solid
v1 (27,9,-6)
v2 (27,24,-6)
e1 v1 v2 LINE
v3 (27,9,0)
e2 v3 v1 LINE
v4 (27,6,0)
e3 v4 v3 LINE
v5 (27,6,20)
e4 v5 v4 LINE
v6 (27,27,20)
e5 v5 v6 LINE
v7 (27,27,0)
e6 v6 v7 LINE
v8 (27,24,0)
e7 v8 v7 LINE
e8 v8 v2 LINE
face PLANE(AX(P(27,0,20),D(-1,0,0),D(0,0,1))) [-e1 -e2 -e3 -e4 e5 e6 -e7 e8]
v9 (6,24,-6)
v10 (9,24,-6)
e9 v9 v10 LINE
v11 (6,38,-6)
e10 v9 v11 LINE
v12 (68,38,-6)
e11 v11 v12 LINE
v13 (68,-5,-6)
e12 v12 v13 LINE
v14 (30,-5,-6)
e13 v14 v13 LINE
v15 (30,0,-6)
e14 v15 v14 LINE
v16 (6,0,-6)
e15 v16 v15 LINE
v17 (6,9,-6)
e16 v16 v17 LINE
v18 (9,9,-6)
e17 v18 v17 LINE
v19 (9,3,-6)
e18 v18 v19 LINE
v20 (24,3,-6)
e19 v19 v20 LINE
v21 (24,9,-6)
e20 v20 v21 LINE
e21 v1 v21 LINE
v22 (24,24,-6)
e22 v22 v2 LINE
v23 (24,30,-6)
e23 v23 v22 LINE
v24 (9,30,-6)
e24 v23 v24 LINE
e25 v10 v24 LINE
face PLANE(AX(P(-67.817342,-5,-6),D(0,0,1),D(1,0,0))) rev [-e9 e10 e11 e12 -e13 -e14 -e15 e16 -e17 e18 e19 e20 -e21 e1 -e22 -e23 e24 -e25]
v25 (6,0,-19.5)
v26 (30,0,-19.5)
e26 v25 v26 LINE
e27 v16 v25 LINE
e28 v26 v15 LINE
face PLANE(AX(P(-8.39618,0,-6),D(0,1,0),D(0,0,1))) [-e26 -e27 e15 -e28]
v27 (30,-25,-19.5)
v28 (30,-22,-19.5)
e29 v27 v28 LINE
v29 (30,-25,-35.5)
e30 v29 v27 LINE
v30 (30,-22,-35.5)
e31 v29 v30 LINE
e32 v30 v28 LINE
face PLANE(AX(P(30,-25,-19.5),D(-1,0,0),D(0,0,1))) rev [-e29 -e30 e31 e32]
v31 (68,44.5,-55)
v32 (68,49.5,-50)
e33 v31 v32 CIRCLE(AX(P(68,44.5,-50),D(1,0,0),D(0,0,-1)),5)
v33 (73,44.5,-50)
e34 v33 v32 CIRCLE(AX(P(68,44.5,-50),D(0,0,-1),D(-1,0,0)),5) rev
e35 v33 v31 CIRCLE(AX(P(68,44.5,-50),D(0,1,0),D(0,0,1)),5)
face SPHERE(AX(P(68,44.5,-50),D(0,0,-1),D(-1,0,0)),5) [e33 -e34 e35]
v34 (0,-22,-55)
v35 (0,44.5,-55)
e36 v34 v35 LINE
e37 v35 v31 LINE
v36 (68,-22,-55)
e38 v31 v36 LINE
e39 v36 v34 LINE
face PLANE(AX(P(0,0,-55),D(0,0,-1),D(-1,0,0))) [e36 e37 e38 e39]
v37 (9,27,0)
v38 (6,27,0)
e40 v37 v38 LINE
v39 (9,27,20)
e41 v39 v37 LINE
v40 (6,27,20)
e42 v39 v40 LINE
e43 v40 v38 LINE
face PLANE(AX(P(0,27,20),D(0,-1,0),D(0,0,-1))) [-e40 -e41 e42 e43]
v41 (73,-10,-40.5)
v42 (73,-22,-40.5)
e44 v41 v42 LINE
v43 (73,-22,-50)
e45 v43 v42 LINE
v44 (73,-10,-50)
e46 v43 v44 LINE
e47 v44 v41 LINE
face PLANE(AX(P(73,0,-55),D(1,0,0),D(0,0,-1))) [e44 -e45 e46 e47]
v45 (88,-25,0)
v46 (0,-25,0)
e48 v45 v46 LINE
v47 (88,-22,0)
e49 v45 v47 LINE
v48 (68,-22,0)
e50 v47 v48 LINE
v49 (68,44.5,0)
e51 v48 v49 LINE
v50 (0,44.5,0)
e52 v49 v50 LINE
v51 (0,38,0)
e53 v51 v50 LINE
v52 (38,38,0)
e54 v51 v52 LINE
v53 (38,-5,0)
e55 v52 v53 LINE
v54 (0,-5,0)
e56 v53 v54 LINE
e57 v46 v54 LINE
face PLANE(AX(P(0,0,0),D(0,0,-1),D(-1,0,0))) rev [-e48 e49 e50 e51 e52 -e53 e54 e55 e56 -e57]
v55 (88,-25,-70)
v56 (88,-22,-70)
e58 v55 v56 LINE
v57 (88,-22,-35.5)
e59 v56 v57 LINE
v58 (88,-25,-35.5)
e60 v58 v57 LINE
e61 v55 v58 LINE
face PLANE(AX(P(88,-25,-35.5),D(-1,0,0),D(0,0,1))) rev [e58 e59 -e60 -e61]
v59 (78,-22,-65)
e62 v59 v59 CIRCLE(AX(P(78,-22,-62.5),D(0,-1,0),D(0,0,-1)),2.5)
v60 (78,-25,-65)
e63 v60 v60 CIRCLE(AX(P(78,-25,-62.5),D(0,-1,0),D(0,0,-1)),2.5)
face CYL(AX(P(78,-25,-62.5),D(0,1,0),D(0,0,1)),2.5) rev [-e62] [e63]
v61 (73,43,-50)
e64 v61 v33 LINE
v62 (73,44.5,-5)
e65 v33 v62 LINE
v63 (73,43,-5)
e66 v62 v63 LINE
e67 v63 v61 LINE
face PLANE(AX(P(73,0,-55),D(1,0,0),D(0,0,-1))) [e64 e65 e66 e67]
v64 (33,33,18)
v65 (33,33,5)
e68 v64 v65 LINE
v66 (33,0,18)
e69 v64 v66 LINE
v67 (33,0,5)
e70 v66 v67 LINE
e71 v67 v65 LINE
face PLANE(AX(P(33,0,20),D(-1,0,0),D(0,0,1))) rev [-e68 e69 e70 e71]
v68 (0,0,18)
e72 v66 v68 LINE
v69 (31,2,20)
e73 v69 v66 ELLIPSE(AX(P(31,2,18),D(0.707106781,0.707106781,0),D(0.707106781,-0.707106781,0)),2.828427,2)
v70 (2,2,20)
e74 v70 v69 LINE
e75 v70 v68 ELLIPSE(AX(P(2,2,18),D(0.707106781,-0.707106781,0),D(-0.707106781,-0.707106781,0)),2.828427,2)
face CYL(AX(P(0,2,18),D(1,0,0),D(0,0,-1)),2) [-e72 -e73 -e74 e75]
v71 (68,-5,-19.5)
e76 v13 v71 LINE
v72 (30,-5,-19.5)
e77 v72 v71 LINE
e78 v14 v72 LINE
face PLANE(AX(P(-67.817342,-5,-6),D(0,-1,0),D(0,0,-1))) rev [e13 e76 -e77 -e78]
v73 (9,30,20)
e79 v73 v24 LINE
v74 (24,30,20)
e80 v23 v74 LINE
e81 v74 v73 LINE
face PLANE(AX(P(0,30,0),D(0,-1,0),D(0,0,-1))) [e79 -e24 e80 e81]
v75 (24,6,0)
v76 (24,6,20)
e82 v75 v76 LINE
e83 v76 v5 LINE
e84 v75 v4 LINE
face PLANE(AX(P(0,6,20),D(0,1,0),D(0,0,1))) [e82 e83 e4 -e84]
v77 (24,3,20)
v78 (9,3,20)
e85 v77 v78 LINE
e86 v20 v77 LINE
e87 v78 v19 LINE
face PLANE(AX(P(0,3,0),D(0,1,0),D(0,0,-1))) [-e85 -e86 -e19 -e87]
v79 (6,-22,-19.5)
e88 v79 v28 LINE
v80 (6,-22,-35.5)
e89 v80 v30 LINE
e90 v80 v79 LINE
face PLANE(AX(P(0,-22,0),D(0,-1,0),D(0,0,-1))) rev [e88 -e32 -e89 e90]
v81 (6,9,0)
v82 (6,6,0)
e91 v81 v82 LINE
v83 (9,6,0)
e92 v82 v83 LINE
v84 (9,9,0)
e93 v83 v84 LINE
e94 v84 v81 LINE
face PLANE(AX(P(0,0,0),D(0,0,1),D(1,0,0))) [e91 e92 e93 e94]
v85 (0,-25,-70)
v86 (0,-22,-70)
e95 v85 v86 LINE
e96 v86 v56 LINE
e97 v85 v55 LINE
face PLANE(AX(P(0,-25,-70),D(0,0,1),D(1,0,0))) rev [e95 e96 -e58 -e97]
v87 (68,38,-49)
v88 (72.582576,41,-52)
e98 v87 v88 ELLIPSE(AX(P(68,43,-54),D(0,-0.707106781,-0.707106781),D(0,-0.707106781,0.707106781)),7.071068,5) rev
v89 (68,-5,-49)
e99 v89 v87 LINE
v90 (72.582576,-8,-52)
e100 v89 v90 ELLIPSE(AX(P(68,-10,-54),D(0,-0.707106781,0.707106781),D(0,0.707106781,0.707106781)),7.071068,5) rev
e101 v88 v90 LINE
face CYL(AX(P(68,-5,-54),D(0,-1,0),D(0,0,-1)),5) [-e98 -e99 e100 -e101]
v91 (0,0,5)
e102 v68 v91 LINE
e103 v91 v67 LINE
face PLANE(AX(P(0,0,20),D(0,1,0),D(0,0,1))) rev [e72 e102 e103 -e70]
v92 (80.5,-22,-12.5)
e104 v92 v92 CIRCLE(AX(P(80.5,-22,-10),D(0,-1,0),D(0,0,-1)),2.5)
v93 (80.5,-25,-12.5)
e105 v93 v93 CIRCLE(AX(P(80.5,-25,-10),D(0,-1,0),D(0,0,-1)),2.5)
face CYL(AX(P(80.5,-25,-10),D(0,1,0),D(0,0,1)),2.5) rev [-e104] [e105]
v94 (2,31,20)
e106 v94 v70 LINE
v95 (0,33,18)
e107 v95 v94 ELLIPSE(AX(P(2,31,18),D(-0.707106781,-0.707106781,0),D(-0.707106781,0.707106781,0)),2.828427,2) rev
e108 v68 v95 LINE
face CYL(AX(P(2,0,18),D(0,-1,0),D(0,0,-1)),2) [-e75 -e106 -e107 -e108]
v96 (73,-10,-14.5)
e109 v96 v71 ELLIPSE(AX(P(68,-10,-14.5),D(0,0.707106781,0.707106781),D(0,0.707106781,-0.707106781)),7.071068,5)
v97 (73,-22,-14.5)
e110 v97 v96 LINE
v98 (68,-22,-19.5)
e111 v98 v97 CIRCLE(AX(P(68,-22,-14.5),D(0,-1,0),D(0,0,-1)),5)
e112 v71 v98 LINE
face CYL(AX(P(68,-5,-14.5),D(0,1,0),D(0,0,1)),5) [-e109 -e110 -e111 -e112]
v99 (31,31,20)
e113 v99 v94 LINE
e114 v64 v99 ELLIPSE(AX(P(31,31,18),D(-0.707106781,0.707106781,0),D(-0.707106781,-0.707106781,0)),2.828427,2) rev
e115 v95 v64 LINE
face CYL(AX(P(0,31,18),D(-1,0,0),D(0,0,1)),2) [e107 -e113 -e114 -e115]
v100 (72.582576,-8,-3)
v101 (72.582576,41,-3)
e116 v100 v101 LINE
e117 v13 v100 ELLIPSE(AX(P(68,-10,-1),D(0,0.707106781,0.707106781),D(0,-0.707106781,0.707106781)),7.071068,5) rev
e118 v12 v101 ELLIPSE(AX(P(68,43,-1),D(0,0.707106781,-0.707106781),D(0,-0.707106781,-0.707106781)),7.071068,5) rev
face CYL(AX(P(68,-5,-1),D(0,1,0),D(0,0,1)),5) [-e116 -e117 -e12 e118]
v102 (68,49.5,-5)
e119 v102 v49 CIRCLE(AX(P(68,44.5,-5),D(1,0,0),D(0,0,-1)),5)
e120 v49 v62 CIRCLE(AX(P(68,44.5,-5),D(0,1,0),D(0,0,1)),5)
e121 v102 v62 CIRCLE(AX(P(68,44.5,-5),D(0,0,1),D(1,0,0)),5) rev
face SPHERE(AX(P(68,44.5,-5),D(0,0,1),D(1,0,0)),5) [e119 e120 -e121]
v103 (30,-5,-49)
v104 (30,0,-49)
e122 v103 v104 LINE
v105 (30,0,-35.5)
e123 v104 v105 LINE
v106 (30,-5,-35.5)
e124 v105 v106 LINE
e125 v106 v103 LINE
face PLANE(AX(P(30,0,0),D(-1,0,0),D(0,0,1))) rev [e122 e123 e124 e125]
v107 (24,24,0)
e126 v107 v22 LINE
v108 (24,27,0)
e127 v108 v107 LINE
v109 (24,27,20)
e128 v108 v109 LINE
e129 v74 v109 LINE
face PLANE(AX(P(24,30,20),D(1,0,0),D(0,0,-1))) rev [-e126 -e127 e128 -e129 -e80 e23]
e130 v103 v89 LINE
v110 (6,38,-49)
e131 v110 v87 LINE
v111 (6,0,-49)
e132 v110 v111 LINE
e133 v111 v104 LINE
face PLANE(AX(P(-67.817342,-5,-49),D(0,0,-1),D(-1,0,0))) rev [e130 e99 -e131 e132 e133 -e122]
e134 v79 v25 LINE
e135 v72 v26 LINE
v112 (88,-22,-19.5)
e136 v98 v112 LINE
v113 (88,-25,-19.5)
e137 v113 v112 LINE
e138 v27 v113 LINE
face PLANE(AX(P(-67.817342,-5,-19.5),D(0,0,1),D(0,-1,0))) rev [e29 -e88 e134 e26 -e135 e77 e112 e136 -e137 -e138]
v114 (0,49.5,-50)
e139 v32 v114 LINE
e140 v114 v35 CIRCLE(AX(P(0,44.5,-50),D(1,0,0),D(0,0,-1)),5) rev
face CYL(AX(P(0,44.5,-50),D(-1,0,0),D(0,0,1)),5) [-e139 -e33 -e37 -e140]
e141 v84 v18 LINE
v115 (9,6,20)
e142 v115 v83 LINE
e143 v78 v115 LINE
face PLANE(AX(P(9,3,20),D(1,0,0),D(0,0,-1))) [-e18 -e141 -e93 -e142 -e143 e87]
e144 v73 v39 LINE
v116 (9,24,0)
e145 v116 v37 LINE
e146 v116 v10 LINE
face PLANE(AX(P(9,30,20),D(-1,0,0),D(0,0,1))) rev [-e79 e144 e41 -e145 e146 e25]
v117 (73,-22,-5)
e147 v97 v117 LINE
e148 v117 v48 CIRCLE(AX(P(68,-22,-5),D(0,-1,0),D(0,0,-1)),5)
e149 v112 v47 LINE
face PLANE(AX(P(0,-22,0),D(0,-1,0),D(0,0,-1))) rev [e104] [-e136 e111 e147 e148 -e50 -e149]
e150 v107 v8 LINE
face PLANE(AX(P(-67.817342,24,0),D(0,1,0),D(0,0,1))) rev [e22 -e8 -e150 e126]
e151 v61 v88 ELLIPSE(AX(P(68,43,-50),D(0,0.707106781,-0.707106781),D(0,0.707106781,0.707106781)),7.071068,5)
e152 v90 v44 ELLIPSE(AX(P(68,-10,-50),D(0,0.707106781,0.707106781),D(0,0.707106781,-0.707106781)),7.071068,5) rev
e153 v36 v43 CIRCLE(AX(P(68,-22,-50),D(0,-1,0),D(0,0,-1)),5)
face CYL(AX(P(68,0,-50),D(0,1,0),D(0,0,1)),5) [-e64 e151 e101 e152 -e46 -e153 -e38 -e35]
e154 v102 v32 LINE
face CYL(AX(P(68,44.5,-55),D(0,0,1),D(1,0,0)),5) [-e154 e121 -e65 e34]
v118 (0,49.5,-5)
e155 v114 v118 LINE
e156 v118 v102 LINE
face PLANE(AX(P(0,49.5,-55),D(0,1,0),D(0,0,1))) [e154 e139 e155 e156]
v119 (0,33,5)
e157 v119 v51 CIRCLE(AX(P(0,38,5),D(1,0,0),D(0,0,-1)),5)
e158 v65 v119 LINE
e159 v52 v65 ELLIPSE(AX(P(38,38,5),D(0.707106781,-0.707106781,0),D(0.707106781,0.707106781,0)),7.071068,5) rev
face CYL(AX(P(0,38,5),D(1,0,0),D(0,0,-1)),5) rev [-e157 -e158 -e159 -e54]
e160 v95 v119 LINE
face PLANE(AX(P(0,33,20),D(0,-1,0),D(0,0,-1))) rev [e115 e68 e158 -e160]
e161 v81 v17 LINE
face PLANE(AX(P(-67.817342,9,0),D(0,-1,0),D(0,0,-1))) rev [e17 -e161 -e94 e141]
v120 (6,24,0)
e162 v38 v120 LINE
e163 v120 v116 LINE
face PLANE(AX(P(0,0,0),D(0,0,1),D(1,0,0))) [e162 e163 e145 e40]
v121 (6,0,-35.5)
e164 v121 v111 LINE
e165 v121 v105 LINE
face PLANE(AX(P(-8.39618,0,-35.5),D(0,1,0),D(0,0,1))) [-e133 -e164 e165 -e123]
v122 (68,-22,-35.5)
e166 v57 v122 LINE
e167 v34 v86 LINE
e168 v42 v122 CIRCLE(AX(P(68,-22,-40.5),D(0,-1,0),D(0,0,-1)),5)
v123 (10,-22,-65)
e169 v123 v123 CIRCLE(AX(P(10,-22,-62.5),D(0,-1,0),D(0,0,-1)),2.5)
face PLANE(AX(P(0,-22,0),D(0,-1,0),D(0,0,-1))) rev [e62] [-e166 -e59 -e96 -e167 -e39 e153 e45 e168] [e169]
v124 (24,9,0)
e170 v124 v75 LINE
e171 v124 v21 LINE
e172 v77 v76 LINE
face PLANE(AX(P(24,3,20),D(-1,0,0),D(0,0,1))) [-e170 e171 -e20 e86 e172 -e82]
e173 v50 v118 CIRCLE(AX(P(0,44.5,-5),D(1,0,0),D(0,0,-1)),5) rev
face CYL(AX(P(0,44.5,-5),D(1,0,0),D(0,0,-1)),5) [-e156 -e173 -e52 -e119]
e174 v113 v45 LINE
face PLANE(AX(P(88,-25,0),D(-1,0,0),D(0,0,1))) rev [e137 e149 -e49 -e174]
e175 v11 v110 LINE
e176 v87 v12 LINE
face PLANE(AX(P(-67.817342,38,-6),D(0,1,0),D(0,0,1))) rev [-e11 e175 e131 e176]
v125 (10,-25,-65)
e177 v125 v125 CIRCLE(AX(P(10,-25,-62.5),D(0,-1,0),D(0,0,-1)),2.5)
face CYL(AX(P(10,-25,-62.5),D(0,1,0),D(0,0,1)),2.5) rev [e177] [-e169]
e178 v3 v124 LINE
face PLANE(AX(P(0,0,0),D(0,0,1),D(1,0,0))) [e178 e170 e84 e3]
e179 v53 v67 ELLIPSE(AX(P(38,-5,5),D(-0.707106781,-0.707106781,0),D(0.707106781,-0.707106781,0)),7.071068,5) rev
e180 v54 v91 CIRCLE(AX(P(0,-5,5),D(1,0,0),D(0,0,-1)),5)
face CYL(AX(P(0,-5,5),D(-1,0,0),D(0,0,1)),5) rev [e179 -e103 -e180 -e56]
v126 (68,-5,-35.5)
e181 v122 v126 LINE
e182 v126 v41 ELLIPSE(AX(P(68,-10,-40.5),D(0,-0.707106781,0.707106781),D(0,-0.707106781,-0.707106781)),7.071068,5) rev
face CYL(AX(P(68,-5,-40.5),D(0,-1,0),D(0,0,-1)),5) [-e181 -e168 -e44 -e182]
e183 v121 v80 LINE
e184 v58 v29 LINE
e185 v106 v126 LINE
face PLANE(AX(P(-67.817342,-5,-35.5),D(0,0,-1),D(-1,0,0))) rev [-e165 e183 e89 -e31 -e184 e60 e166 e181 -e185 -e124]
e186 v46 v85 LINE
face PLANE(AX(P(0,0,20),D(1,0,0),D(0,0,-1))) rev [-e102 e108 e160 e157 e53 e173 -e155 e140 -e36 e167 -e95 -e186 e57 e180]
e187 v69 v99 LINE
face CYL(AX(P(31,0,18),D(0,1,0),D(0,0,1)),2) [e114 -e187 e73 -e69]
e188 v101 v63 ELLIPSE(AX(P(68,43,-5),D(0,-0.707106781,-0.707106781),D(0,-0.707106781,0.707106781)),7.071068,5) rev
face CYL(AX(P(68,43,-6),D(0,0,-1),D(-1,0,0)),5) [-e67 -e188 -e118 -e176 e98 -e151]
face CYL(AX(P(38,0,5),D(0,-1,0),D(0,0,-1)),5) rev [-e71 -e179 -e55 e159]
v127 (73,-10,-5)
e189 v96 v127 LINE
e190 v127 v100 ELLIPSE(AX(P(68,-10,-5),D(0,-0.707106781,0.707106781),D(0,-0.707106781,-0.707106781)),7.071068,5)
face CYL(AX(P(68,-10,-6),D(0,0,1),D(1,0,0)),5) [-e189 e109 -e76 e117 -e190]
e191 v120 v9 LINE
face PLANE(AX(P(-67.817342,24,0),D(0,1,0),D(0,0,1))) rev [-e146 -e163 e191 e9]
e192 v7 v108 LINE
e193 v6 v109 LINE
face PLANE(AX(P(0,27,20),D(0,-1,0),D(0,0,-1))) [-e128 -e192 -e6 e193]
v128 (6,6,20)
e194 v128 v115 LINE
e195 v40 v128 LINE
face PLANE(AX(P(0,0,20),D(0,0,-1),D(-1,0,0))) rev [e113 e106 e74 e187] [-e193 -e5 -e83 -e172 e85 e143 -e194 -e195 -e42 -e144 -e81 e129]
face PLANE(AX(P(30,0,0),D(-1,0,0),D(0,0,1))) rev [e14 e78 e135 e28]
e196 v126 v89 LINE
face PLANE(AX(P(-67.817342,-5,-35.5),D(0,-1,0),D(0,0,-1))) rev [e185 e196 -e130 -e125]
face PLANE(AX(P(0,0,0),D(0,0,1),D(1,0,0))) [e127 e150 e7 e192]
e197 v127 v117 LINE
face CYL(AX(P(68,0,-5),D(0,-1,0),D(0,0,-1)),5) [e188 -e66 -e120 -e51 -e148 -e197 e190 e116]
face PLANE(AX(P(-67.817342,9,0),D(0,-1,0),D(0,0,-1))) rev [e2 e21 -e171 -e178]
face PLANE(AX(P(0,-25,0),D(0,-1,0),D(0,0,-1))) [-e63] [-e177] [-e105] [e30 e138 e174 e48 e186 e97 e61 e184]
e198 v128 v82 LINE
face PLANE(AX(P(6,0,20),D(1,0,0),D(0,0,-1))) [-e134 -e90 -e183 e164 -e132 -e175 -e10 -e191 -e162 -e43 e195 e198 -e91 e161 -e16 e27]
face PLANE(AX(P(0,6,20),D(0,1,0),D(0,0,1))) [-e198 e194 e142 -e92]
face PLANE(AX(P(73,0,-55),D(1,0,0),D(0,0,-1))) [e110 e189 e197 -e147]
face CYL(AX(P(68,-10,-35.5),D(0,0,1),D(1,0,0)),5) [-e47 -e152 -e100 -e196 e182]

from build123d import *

# Parameters (mm, degrees)
SKETCH1_W           = 33
SKETCH1_H           = 33
BOSS_EXTRUDE1_DEPTH = 20
SHELL1_T            = -6
SKETCH2_W           = 73
SKETCH2_H           = 71.5
BOSS_EXTRUDE2_DEPTH = 55
SKETCH7_W           = 15
SKETCH7_H           = 50
CUT_EXTRUDE2_DEPTH  = 3
SKETCH9_W           = 21
SKETCH9_H           = 21
CUT_EXTRUDE5_DEPTH  = 45
SKETCH16_W          = 55
SKETCH16_H          = 55
BOSS_EXTRUDE5_DEPTH = 40
CUT_EXTRUDE14_REACH = 105.943
BOSS_EXTRUDE6_START = -26
SKETCH23_W          = 3
SKETCH23_H          = 3
BOSS_EXTRUDE6_DEPTH = 6
BOSS_EXTRUDE7_REACH = 148.943
BOSS_EXTRUDE7_START = -43
SKETCH24_W          = 13.5
SKETCH24_H          = 5
SKETCH25_R          = 2.5
BOSS_EXTRUDE8_DEPTH = 3
FILLET1_R           = 5
FILLET2_R           = 2


with BuildPart() as part:
    # Sketch1 → Boss-Extrude1 (new body)
    with BuildSketch(Plane.XY):
        with Locations((16.5, 16.5)):
            Rectangle(SKETCH1_W, SKETCH1_H)
    extrude(amount=BOSS_EXTRUDE1_DEPTH)

    # Shell1
    shell1_openings = [part.faces().sort_by_distance(p)[0] for p in [
        (16.5, 16.5, 20),
    ]]
    offset(amount=SHELL1_T, openings=shell1_openings, kind=Kind.INTERSECTION)

    # Sketch2 → Boss-Extrude2 (add)
    with BuildSketch(Plane(origin=(0, 0, 0), x_dir=(-1, 0, 0), z_dir=(0, 0, -1))):
        with Locations((-36.5, 13.75)):
            Rectangle(SKETCH2_W, SKETCH2_H)
    extrude(amount=BOSS_EXTRUDE2_DEPTH)

    # Sketch7 → Cut-Extrude2 (cut)
    with BuildSketch(Plane.XZ.offset(-27)):
        with Locations((16.5, -5)):
            Rectangle(SKETCH7_W, SKETCH7_H)
    cut_extrude2 = extrude(amount=-CUT_EXTRUDE2_DEPTH, mode=Mode.SUBTRACT)

    # Sketch9 → Cut-Extrude5 (cut)
    with BuildSketch(Plane.XY.offset(6)):
        with Locations((16.5, 16.5)):
            Rectangle(SKETCH9_W, SKETCH9_H)
    extrude(amount=-CUT_EXTRUDE5_DEPTH, mode=Mode.SUBTRACT)

    # Mirror2: Cut-Extrude2 across plane
    add(cut_extrude2.mirror(Plane(origin=(0, 16.5, 0), x_dir=(0, 0, 1), z_dir=(0, -1, 0))), mode=Mode.SUBTRACT)

    # Sketch16 → Boss-Extrude5 (add)
    with BuildSketch(Plane(origin=(33, 0, 0), x_dir=(0, 0, -1), z_dir=(1, 0, 0))):
        with Locations((27.5, 16.5)):
            Rectangle(SKETCH16_W, SKETCH16_H)
    extrude(amount=BOSS_EXTRUDE5_DEPTH)

    # Cut-Extrude14: up to this face of the body (flat: up to its plane)
    cut_extrude14_end = Plane(part.part.faces().sort_by_distance((6, 16.5, -9.5))[0])
    # Sketch22 → Cut-Extrude14 (cut, up to the picked face)
    with BuildSketch(Plane(origin=(73, 0, 0), x_dir=(0, 0, -1), z_dir=(1, 0, 0)), mode=Mode.PRIVATE) as cut_extrude14_sk1:
        Polygon((6, -5), (19.5, -5), (19.5, -22), (35.5, -22), (35.5, -5), (49, -5), (49, 38), (6, 38), align=None)
    cut_extrude14_tool1 = split(extrude(cut_extrude14_sk1.sketch, amount=-CUT_EXTRUDE14_REACH, mode=Mode.PRIVATE), bisect_by=cut_extrude14_end, keep=Keep.BOTH, mode=Mode.PRIVATE)
    add(cut_extrude14_tool1.solids().sort_by(Axis((73, 12.652758, -27.5), (-1, 0, 0)))[0], mode=Mode.SUBTRACT)

    # Sketch23 → Boss-Extrude6 (add)
    with BuildSketch(Plane.XY.offset(20).offset(BOSS_EXTRUDE6_START)):
        with Locations((7.5, 7.5)):
            Rectangle(SKETCH23_W, SKETCH23_H)
        with Locations((7.5, 25.5)):
            Rectangle(SKETCH23_W, SKETCH23_H)
        with Locations((25.5, 25.5)):
            Rectangle(SKETCH23_W, SKETCH23_H)
        with Locations((25.5, 7.5)):
            Rectangle(SKETCH23_W, SKETCH23_H)
    extrude(amount=BOSS_EXTRUDE6_DEPTH)

    # Sketch24 → Boss-Extrude7 (add, up to next)
    with BuildSketch(Plane(origin=(73, 0, 0), x_dir=(0, 0, -1), z_dir=(1, 0, 0)).offset(BOSS_EXTRUDE7_START), mode=Mode.PRIVATE) as boss_extrude7_sk1:
        with Locations((12.75, -2.5)):
            Rectangle(SKETCH24_W, SKETCH24_H)
    boss_extrude7_tool1 = extrude(boss_extrude7_sk1.sketch, amount=-BOSS_EXTRUDE7_REACH, mode=Mode.PRIVATE) - part.part
    # Sketch24 → Boss-Extrude7 (add, up to next)
    with BuildSketch(Plane(origin=(73, 0, 0), x_dir=(0, 0, -1), z_dir=(1, 0, 0)).offset(BOSS_EXTRUDE7_START), mode=Mode.PRIVATE) as boss_extrude7_sk2:
        with Locations((42.25, -2.5)):
            Rectangle(SKETCH24_W, SKETCH24_H)
    boss_extrude7_tool2 = extrude(boss_extrude7_sk2.sketch, amount=-BOSS_EXTRUDE7_REACH, mode=Mode.PRIVATE) - part.part
    add(boss_extrude7_tool1.solids().sort_by_distance((30, -2.5, -12.75))[0])
    add(boss_extrude7_tool2.solids().sort_by_distance((30, -2.5, -42.25))[0])

    # Sketch25 → Boss-Extrude8 (add)
    with BuildSketch(Plane.XZ.offset(22)):
        Polygon((0, 0), (88, 0), (88, -19.5), (30, -19.5), (30, -35.5), (88, -35.5), (88, -70), (0, -70), align=None)
        with Locations(Location((10, -62.5, 0), (0, 0, 270))):
            Circle(SKETCH25_R, mode=Mode.SUBTRACT)
        with Locations(Location((78, -62.5, 0), (0, 0, 270))):
            Circle(SKETCH25_R, mode=Mode.SUBTRACT)
        with Locations(Location((80.5, -10, 0), (0, 0, 270))):
            Circle(SKETCH25_R, mode=Mode.SUBTRACT)
    extrude(amount=BOSS_EXTRUDE8_DEPTH)

    # Fillet1
    # the kernel refuses this fillet: 5 mm, written as the material it adds along each edge
    with BuildSketch(Plane(origin=(33, 33, 0), x_dir=(0, 0, 1), z_dir=(-1, 0, 0)), Plane(origin=(33, 0, 0), x_dir=(0, 0, 1), z_dir=(0, 1, 0)), Plane(origin=(0, 0, 0), x_dir=(0, 0, 1), z_dir=(1, 0, 0))) as fillet1_piece_1:
        with BuildLine():
            CenterArc((FILLET1_R, FILLET1_R), FILLET1_R, 180, 90)
            Line((0, FILLET1_R), (-FILLET1_R * 0.02, FILLET1_R))
            Line((-FILLET1_R * 0.02, FILLET1_R), (-FILLET1_R * 0.02, -FILLET1_R * 0.02))
            Line((-FILLET1_R * 0.02, -FILLET1_R * 0.02), (FILLET1_R, -FILLET1_R * 0.02))
            Line((FILLET1_R, -FILLET1_R * 0.02), (FILLET1_R, 0))
        make_face()
    extrude(amount=33)
    with BuildSketch(Plane(origin=(33, 0, 0), x_dir=(0, 0, 1), z_dir=(0, 1, 0))) as fillet1_piece_2a_section:
        with BuildLine():
            CenterArc((FILLET1_R, FILLET1_R), FILLET1_R, 180, 90)
            Line((0, FILLET1_R), (-FILLET1_R * 0.02, FILLET1_R))
            Line((-FILLET1_R * 0.02, FILLET1_R), (-FILLET1_R * 0.02, -FILLET1_R * 0.02))
            Line((-FILLET1_R * 0.02, -FILLET1_R * 0.02), (FILLET1_R, -FILLET1_R * 0.02))
            Line((FILLET1_R, -FILLET1_R * 0.02), (FILLET1_R, 0))
        make_face()
    fillet1_piece_2a = extrude(amount=45.5, mode=Mode.PRIVATE)
    fillet1_piece_2a = split(fillet1_piece_2a, bisect_by=Plane(origin=(34.131975571, 33, 1.131975571), z_dir=(0, 1, 0)), keep=Keep.TOP, mode=Mode.PRIVATE)
    with BuildSketch(Plane(origin=(45.5, 33, 0), x_dir=(0, 0, 1), z_dir=(-1, 0, 0))) as fillet1_piece_2b_section:
        with BuildLine():
            CenterArc((FILLET1_R, FILLET1_R), FILLET1_R, 180, 90)
            Line((0, FILLET1_R), (-FILLET1_R * 0.02, FILLET1_R))
            Line((-FILLET1_R * 0.02, FILLET1_R), (-FILLET1_R * 0.02, -FILLET1_R * 0.02))
            Line((-FILLET1_R * 0.02, -FILLET1_R * 0.02), (FILLET1_R, -FILLET1_R * 0.02))
            Line((FILLET1_R, -FILLET1_R * 0.02), (FILLET1_R, 0))
        make_face()
    fillet1_piece_2b = extrude(amount=45.5, mode=Mode.PRIVATE)
    fillet1_piece_2b = split(fillet1_piece_2b, bisect_by=Plane(origin=(33, 34.131975571, 1.131975571), z_dir=(1, 0, 0)), keep=Keep.TOP, mode=Mode.PRIVATE)
    fillet1_piece_2 = fillet1_piece_2a & fillet1_piece_2b
    add(fillet1_piece_2)
    with BuildSketch(Plane(origin=(0, 0, 0), x_dir=(0, 0, 1), z_dir=(1, 0, 0))) as fillet1_piece_3a_section:
        with BuildLine():
            CenterArc((FILLET1_R, FILLET1_R), FILLET1_R, 180, 90)
            Line((0, FILLET1_R), (-FILLET1_R * 0.02, FILLET1_R))
            Line((-FILLET1_R * 0.02, FILLET1_R), (-FILLET1_R * 0.02, -FILLET1_R * 0.02))
            Line((-FILLET1_R * 0.02, -FILLET1_R * 0.02), (FILLET1_R, -FILLET1_R * 0.02))
            Line((FILLET1_R, -FILLET1_R * 0.02), (FILLET1_R, 0))
        make_face()
    fillet1_piece_3a = extrude(amount=45.5, mode=Mode.PRIVATE)
    fillet1_piece_3a = split(fillet1_piece_3a, bisect_by=Plane(origin=(33, -1.131975571, 1.131975571), z_dir=(1, 0, 0)), keep=Keep.TOP, mode=Mode.PRIVATE)
    with BuildSketch(Plane(origin=(33, -12.5, 0), x_dir=(0, 0, 1), z_dir=(0, 1, 0))) as fillet1_piece_3b_section:
        with BuildLine():
            CenterArc((FILLET1_R, FILLET1_R), FILLET1_R, 180, 90)
            Line((0, FILLET1_R), (-FILLET1_R * 0.02, FILLET1_R))
            Line((-FILLET1_R * 0.02, FILLET1_R), (-FILLET1_R * 0.02, -FILLET1_R * 0.02))
            Line((-FILLET1_R * 0.02, -FILLET1_R * 0.02), (FILLET1_R, -FILLET1_R * 0.02))
            Line((FILLET1_R, -FILLET1_R * 0.02), (FILLET1_R, 0))
        make_face()
    fillet1_piece_3b = extrude(amount=45.5, mode=Mode.PRIVATE)
    fillet1_piece_3b = split(fillet1_piece_3b, bisect_by=Plane(origin=(34.131975571, 0, 1.131975571), z_dir=(0, -1, 0)), keep=Keep.TOP, mode=Mode.PRIVATE)
    fillet1_piece_3 = fillet1_piece_3a & fillet1_piece_3b
    add(fillet1_piece_3)
    # the kernel refuses this fillet: 5 mm, written as the material it takes off along each edge
    with BuildSketch(Plane(origin=(68, 44.5, -50), x_dir=(0, 1, 0), z_dir=(1, 0, 0))) as fillet1_2_piece_1_section:
        Polygon((0, 0), (FILLET1_R * 1.02, 0), (FILLET1_R * 1.02, -FILLET1_R * 1.02), (0, -FILLET1_R * 1.02), align=None)
    fillet1_2_piece_1 = extrude(amount=FILLET1_R * 1.02, mode=Mode.PRIVATE)
    fillet1_2_piece_1 = fillet1_2_piece_1 - Plane(origin=(68, 44.5, -50), x_dir=(0, -0.7071067811865475, 0.7071067811865475), z_dir=(1, 0, 0)) * Sphere(FILLET1_R, mode=Mode.PRIVATE)
    add(fillet1_2_piece_1, mode=Mode.SUBTRACT)
    with BuildSketch(Plane(origin=(68, 44.5, -5), x_dir=(0, 1, 0), z_dir=(1, 0, 0))) as fillet1_2_piece_2_section:
        Polygon((0, 0), (FILLET1_R * 1.02, 0), (FILLET1_R * 1.02, FILLET1_R * 1.02), (0, FILLET1_R * 1.02), align=None)
    fillet1_2_piece_2 = extrude(amount=FILLET1_R * 1.02, mode=Mode.PRIVATE)
    fillet1_2_piece_2 = fillet1_2_piece_2 - Plane(origin=(68, 44.5, -5), x_dir=(0, -0.7071067811865475, -0.7071067811865475), z_dir=(1, 0, 0)) * Sphere(FILLET1_R, mode=Mode.PRIVATE)
    add(fillet1_2_piece_2, mode=Mode.SUBTRACT)
    with BuildSketch(Plane(origin=(73, -5, -49), x_dir=(0, 0, -1), z_dir=(0, 1, 0)), Plane(origin=(73, 38, -49), x_dir=(0, 1, 0), z_dir=(0, 0, 1)), Plane(origin=(73, 38, -6), x_dir=(0, 0, 1), z_dir=(0, -1, 0))) as fillet1_2_piece_3:
        with BuildLine():
            CenterArc((FILLET1_R, FILLET1_R), FILLET1_R, 180, 90)
            Line((0, FILLET1_R), (-FILLET1_R * 0.02, FILLET1_R))
            Line((-FILLET1_R * 0.02, FILLET1_R), (-FILLET1_R * 0.02, -FILLET1_R * 0.02))
            Line((-FILLET1_R * 0.02, -FILLET1_R * 0.02), (FILLET1_R, -FILLET1_R * 0.02))
            Line((FILLET1_R, -FILLET1_R * 0.02), (FILLET1_R, 0))
        make_face()
    extrude(amount=43, mode=Mode.SUBTRACT)
    with BuildSketch(Plane(origin=(73, -5, -6), x_dir=(0, -1, 0), z_dir=(0, 0, -1)), Plane(origin=(73, -5, -35.5), x_dir=(0, -1, 0), z_dir=(0, 0, -1))) as fillet1_2_piece_4:
        with BuildLine():
            CenterArc((FILLET1_R, FILLET1_R), FILLET1_R, 180, 90)
            Line((0, FILLET1_R), (-FILLET1_R * 0.02, FILLET1_R))
            Line((-FILLET1_R * 0.02, FILLET1_R), (-FILLET1_R * 0.02, -FILLET1_R * 0.02))
            Line((-FILLET1_R * 0.02, -FILLET1_R * 0.02), (FILLET1_R, -FILLET1_R * 0.02))
            Line((FILLET1_R, -FILLET1_R * 0.02), (FILLET1_R, 0))
        make_face()
    extrude(amount=13.5, mode=Mode.SUBTRACT)
    with BuildSketch(Plane(origin=(73, -5, -19.5), x_dir=(0, 0, 1), z_dir=(0, -1, 0)), Plane(origin=(73, -22, -35.5), x_dir=(0, 0, -1), z_dir=(0, 1, 0))) as fillet1_2_piece_5:
        with BuildLine():
            CenterArc((FILLET1_R, FILLET1_R), FILLET1_R, 180, 90)
            Line((0, FILLET1_R), (-FILLET1_R * 0.02, FILLET1_R))
            Line((-FILLET1_R * 0.02, FILLET1_R), (-FILLET1_R * 0.02, -FILLET1_R * 0.02))
            Line((-FILLET1_R * 0.02, -FILLET1_R * 0.02), (FILLET1_R, -FILLET1_R * 0.02))
            Line((FILLET1_R, -FILLET1_R * 0.02), (FILLET1_R, 0))
        make_face()
    extrude(amount=17, mode=Mode.SUBTRACT)
    with BuildSketch(Plane(origin=(0, 49.5, -55), x_dir=(0, 0, 1), z_dir=(1, 0, 0))) as fillet1_2_piece_6:
        with BuildLine():
            CenterArc((FILLET1_R, FILLET1_R), FILLET1_R, 180, 90)
            Line((0, FILLET1_R), (-FILLET1_R * 0.02, FILLET1_R))
            Line((-FILLET1_R * 0.02, FILLET1_R), (-FILLET1_R * 0.02, -FILLET1_R * 0.02))
            Line((-FILLET1_R * 0.02, -FILLET1_R * 0.02), (FILLET1_R, -FILLET1_R * 0.02))
            Line((FILLET1_R, -FILLET1_R * 0.02), (FILLET1_R, 0))
        make_face()
    extrude(amount=68, mode=Mode.SUBTRACT)
    with BuildSketch(Plane(origin=(73, -22, -55), x_dir=(0, 0, 1), z_dir=(0, 1, 0)), Plane(origin=(73, 44.5, 0), x_dir=(0, 0, -1), z_dir=(0, -1, 0))) as fillet1_2_piece_7:
        with BuildLine():
            CenterArc((FILLET1_R, -FILLET1_R), FILLET1_R, 90, 90)
            Line((0, -FILLET1_R), (-FILLET1_R * 0.02, -FILLET1_R))
            Line((-FILLET1_R * 0.02, -FILLET1_R), (-FILLET1_R * 0.02, FILLET1_R * 0.02))
            Line((-FILLET1_R * 0.02, FILLET1_R * 0.02), (FILLET1_R, FILLET1_R * 0.02))
            Line((FILLET1_R, FILLET1_R * 0.02), (FILLET1_R, 0))
        make_face()
    extrude(amount=66.5, mode=Mode.SUBTRACT)
    with BuildSketch(Plane(origin=(73, 49.5, -5), x_dir=(0, -1, 0), z_dir=(0, 0, -1))) as fillet1_2_piece_8:
        with BuildLine():
            CenterArc((FILLET1_R, FILLET1_R), FILLET1_R, 180, 90)
            Line((0, FILLET1_R), (-FILLET1_R * 0.02, FILLET1_R))
            Line((-FILLET1_R * 0.02, FILLET1_R), (-FILLET1_R * 0.02, -FILLET1_R * 0.02))
            Line((-FILLET1_R * 0.02, -FILLET1_R * 0.02), (FILLET1_R, -FILLET1_R * 0.02))
            Line((FILLET1_R, -FILLET1_R * 0.02), (FILLET1_R, 0))
        make_face()
    extrude(amount=45, mode=Mode.SUBTRACT)
    with BuildSketch(Plane(origin=(0, 49.5, 0), x_dir=(0, 0, -1), z_dir=(1, 0, 0))) as fillet1_2_piece_9:
        with BuildLine():
            CenterArc((FILLET1_R, -FILLET1_R), FILLET1_R, 90, 90)
            Line((0, -FILLET1_R), (-FILLET1_R * 0.02, -FILLET1_R))
            Line((-FILLET1_R * 0.02, -FILLET1_R), (-FILLET1_R * 0.02, FILLET1_R * 0.02))
            Line((-FILLET1_R * 0.02, FILLET1_R * 0.02), (FILLET1_R, FILLET1_R * 0.02))
            Line((FILLET1_R, FILLET1_R * 0.02), (FILLET1_R, 0))
        make_face()
    extrude(amount=68, mode=Mode.SUBTRACT)
    with BuildSketch(Plane(origin=(73, -17.5, -49), x_dir=(0, 0, -1), z_dir=(0, 1, 0))) as fillet1_2_piece_10a_section:
        with BuildLine():
            CenterArc((FILLET1_R, FILLET1_R), FILLET1_R, 180, 90)
            Line((0, FILLET1_R), (-FILLET1_R * 0.02, FILLET1_R))
            Line((-FILLET1_R * 0.02, FILLET1_R), (-FILLET1_R * 0.02, -FILLET1_R * 0.02))
            Line((-FILLET1_R * 0.02, -FILLET1_R * 0.02), (FILLET1_R, -FILLET1_R * 0.02))
            Line((FILLET1_R, -FILLET1_R * 0.02), (FILLET1_R, 0))
        make_face()
    fillet1_2_piece_10a = extrude(amount=55.5, mode=Mode.PRIVATE)
    fillet1_2_piece_10a = split(fillet1_2_piece_10a, bisect_by=Plane(origin=(71.868024429, -5, -50.131975571), z_dir=(0, -1, 0)), keep=Keep.TOP, mode=Mode.PRIVATE)
    with BuildSketch(Plane(origin=(73, -5, -35.5), x_dir=(0, -1, 0), z_dir=(0, 0, -1))) as fillet1_2_piece_10b_section:
        with BuildLine():
            CenterArc((FILLET1_R, FILLET1_R), FILLET1_R, 180, 90)
            Line((0, FILLET1_R), (-FILLET1_R * 0.02, FILLET1_R))
            Line((-FILLET1_R * 0.02, FILLET1_R), (-FILLET1_R * 0.02, -FILLET1_R * 0.02))
            Line((-FILLET1_R * 0.02, -FILLET1_R * 0.02), (FILLET1_R, -FILLET1_R * 0.02))
            Line((FILLET1_R, -FILLET1_R * 0.02), (FILLET1_R, 0))
        make_face()
    fillet1_2_piece_10b = extrude(amount=26, mode=Mode.PRIVATE)
    fillet1_2_piece_10b = split(fillet1_2_piece_10b, bisect_by=Plane(origin=(71.868024429, -6.131975571, -49), z_dir=(0, 0, -1)), keep=Keep.TOP, mode=Mode.PRIVATE)
    fillet1_2_piece_10 = fillet1_2_piece_10a & fillet1_2_piece_10b
    add(fillet1_2_piece_10, mode=Mode.SUBTRACT)
    with BuildSketch(Plane(origin=(73, 38, -61.5), x_dir=(0, 1, 0), z_dir=(0, 0, 1))) as fillet1_2_piece_11a_section:
        with BuildLine():
            CenterArc((FILLET1_R, FILLET1_R), FILLET1_R, 180, 90)
            Line((0, FILLET1_R), (-FILLET1_R * 0.02, FILLET1_R))
            Line((-FILLET1_R * 0.02, FILLET1_R), (-FILLET1_R * 0.02, -FILLET1_R * 0.02))
            Line((-FILLET1_R * 0.02, -FILLET1_R * 0.02), (FILLET1_R, -FILLET1_R * 0.02))
            Line((FILLET1_R, -FILLET1_R * 0.02), (FILLET1_R, 0))
        make_face()
    fillet1_2_piece_11a = extrude(amount=55.5, mode=Mode.PRIVATE)
    fillet1_2_piece_11a = split(fillet1_2_piece_11a, bisect_by=Plane(origin=(71.868024429, 39.131975571, -49), z_dir=(0, 0, -1)), keep=Keep.TOP, mode=Mode.PRIVATE)
    with BuildSketch(Plane(origin=(73, -5, -49), x_dir=(0, 0, -1), z_dir=(0, 1, 0))) as fillet1_2_piece_11b_section:
        with BuildLine():
            CenterArc((FILLET1_R, FILLET1_R), FILLET1_R, 180, 90)
            Line((0, FILLET1_R), (-FILLET1_R * 0.02, FILLET1_R))
            Line((-FILLET1_R * 0.02, FILLET1_R), (-FILLET1_R * 0.02, -FILLET1_R * 0.02))
            Line((-FILLET1_R * 0.02, -FILLET1_R * 0.02), (FILLET1_R, -FILLET1_R * 0.02))
            Line((FILLET1_R, -FILLET1_R * 0.02), (FILLET1_R, 0))
        make_face()
    fillet1_2_piece_11b = extrude(amount=55.5, mode=Mode.PRIVATE)
    fillet1_2_piece_11b = split(fillet1_2_piece_11b, bisect_by=Plane(origin=(71.868024429, 38, -50.131975571), z_dir=(0, 1, 0)), keep=Keep.TOP, mode=Mode.PRIVATE)
    fillet1_2_piece_11 = fillet1_2_piece_11a & fillet1_2_piece_11b
    add(fillet1_2_piece_11, mode=Mode.SUBTRACT)
    with BuildSketch(Plane(origin=(73, 50.5, -6), x_dir=(0, 0, 1), z_dir=(0, -1, 0))) as fillet1_2_piece_12a_section:
        with BuildLine():
            CenterArc((FILLET1_R, FILLET1_R), FILLET1_R, 180, 90)
            Line((0, FILLET1_R), (-FILLET1_R * 0.02, FILLET1_R))
            Line((-FILLET1_R * 0.02, FILLET1_R), (-FILLET1_R * 0.02, -FILLET1_R * 0.02))
            Line((-FILLET1_R * 0.02, -FILLET1_R * 0.02), (FILLET1_R, -FILLET1_R * 0.02))
            Line((FILLET1_R, -FILLET1_R * 0.02), (FILLET1_R, 0))
        make_face()
    fillet1_2_piece_12a = extrude(amount=55.5, mode=Mode.PRIVATE)
    fillet1_2_piece_12a = split(fillet1_2_piece_12a, bisect_by=Plane(origin=(71.868024429, 38, -4.868024429), z_dir=(0, 1, 0)), keep=Keep.TOP, mode=Mode.PRIVATE)
    with BuildSketch(Plane(origin=(73, 38, -49), x_dir=(0, 1, 0), z_dir=(0, 0, 1))) as fillet1_2_piece_12b_section:
        with BuildLine():
            CenterArc((FILLET1_R, FILLET1_R), FILLET1_R, 180, 90)
            Line((0, FILLET1_R), (-FILLET1_R * 0.02, FILLET1_R))
            Line((-FILLET1_R * 0.02, FILLET1_R), (-FILLET1_R * 0.02, -FILLET1_R * 0.02))
            Line((-FILLET1_R * 0.02, -FILLET1_R * 0.02), (FILLET1_R, -FILLET1_R * 0.02))
            Line((FILLET1_R, -FILLET1_R * 0.02), (FILLET1_R, 0))
        make_face()
    fillet1_2_piece_12b = extrude(amount=55.5, mode=Mode.PRIVATE)
    fillet1_2_piece_12b = split(fillet1_2_piece_12b, bisect_by=Plane(origin=(71.868024429, 39.131975571, -6), z_dir=(0, 0, 1)), keep=Keep.TOP, mode=Mode.PRIVATE)
    fillet1_2_piece_12 = fillet1_2_piece_12a & fillet1_2_piece_12b
    add(fillet1_2_piece_12, mode=Mode.SUBTRACT)
    with BuildSketch(Plane(origin=(73, -5, 6.5), x_dir=(0, -1, 0), z_dir=(0, 0, -1))) as fillet1_2_piece_13a_section:
        with BuildLine():
            CenterArc((FILLET1_R, FILLET1_R), FILLET1_R, 180, 90)
            Line((0, FILLET1_R), (-FILLET1_R * 0.02, FILLET1_R))
            Line((-FILLET1_R * 0.02, FILLET1_R), (-FILLET1_R * 0.02, -FILLET1_R * 0.02))
            Line((-FILLET1_R * 0.02, -FILLET1_R * 0.02), (FILLET1_R, -FILLET1_R * 0.02))
            Line((FILLET1_R, -FILLET1_R * 0.02), (FILLET1_R, 0))
        make_face()
    fillet1_2_piece_13a = extrude(amount=26, mode=Mode.PRIVATE)
    fillet1_2_piece_13a = split(fillet1_2_piece_13a, bisect_by=Plane(origin=(71.868024429, -6.131975571, -6), z_dir=(0, 0, 1)), keep=Keep.TOP, mode=Mode.PRIVATE)
    with BuildSketch(Plane(origin=(73, 38, -6), x_dir=(0, 0, 1), z_dir=(0, -1, 0))) as fillet1_2_piece_13b_section:
        with BuildLine():
            CenterArc((FILLET1_R, FILLET1_R), FILLET1_R, 180, 90)
            Line((0, FILLET1_R), (-FILLET1_R * 0.02, FILLET1_R))
            Line((-FILLET1_R * 0.02, FILLET1_R), (-FILLET1_R * 0.02, -FILLET1_R * 0.02))
            Line((-FILLET1_R * 0.02, -FILLET1_R * 0.02), (FILLET1_R, -FILLET1_R * 0.02))
            Line((FILLET1_R, -FILLET1_R * 0.02), (FILLET1_R, 0))
        make_face()
    fillet1_2_piece_13b = extrude(amount=55.5, mode=Mode.PRIVATE)
    fillet1_2_piece_13b = split(fillet1_2_piece_13b, bisect_by=Plane(origin=(71.868024429, -5, -4.868024429), z_dir=(0, -1, 0)), keep=Keep.TOP, mode=Mode.PRIVATE)
    fillet1_2_piece_13 = fillet1_2_piece_13a & fillet1_2_piece_13b
    add(fillet1_2_piece_13, mode=Mode.SUBTRACT)
    with BuildSketch(Plane(origin=(73, 7.5, -19.5), x_dir=(0, 0, 1), z_dir=(0, -1, 0))) as fillet1_2_piece_14a_section:
        with BuildLine():
            CenterArc((FILLET1_R, FILLET1_R), FILLET1_R, 180, 90)
            Line((0, FILLET1_R), (-FILLET1_R * 0.02, FILLET1_R))
            Line((-FILLET1_R * 0.02, FILLET1_R), (-FILLET1_R * 0.02, -FILLET1_R * 0.02))
            Line((-FILLET1_R * 0.02, -FILLET1_R * 0.02), (FILLET1_R, -FILLET1_R * 0.02))
            Line((FILLET1_R, -FILLET1_R * 0.02), (FILLET1_R, 0))
        make_face()
    fillet1_2_piece_14a = extrude(amount=29.5, mode=Mode.PRIVATE)
    fillet1_2_piece_14a = split(fillet1_2_piece_14a, bisect_by=Plane(origin=(71.868024429, -5, -18.368024429), z_dir=(0, 1, 0)), keep=Keep.TOP, mode=Mode.PRIVATE)
    with BuildSketch(Plane(origin=(73, -5, -6), x_dir=(0, -1, 0), z_dir=(0, 0, -1))) as fillet1_2_piece_14b_section:
        with BuildLine():
            CenterArc((FILLET1_R, FILLET1_R), FILLET1_R, 180, 90)
            Line((0, FILLET1_R), (-FILLET1_R * 0.02, FILLET1_R))
            Line((-FILLET1_R * 0.02, FILLET1_R), (-FILLET1_R * 0.02, -FILLET1_R * 0.02))
            Line((-FILLET1_R * 0.02, -FILLET1_R * 0.02), (FILLET1_R, -FILLET1_R * 0.02))
            Line((FILLET1_R, -FILLET1_R * 0.02), (FILLET1_R, 0))
        make_face()
    fillet1_2_piece_14b = extrude(amount=26, mode=Mode.PRIVATE)
    fillet1_2_piece_14b = split(fillet1_2_piece_14b, bisect_by=Plane(origin=(71.868024429, -6.131975571, -19.5), z_dir=(0, 0, -1)), keep=Keep.TOP, mode=Mode.PRIVATE)
    fillet1_2_piece_14 = fillet1_2_piece_14a & fillet1_2_piece_14b
    add(fillet1_2_piece_14, mode=Mode.SUBTRACT)
    with BuildSketch(Plane(origin=(73, -5, -23), x_dir=(0, -1, 0), z_dir=(0, 0, -1))) as fillet1_2_piece_15a_section:
        with BuildLine():
            CenterArc((FILLET1_R, FILLET1_R), FILLET1_R, 180, 90)
            Line((0, FILLET1_R), (-FILLET1_R * 0.02, FILLET1_R))
            Line((-FILLET1_R * 0.02, FILLET1_R), (-FILLET1_R * 0.02, -FILLET1_R * 0.02))
            Line((-FILLET1_R * 0.02, -FILLET1_R * 0.02), (FILLET1_R, -FILLET1_R * 0.02))
            Line((FILLET1_R, -FILLET1_R * 0.02), (FILLET1_R, 0))
        make_face()
    fillet1_2_piece_15a = extrude(amount=26, mode=Mode.PRIVATE)
    fillet1_2_piece_15a = split(fillet1_2_piece_15a, bisect_by=Plane(origin=(71.868024429, -6.131975571, -35.5), z_dir=(0, 0, 1)), keep=Keep.TOP, mode=Mode.PRIVATE)
    with BuildSketch(Plane(origin=(73, -22, -35.5), x_dir=(0, 0, -1), z_dir=(0, 1, 0))) as fillet1_2_piece_15b_section:
        with BuildLine():
            CenterArc((FILLET1_R, FILLET1_R), FILLET1_R, 180, 90)
            Line((0, FILLET1_R), (-FILLET1_R * 0.02, FILLET1_R))
            Line((-FILLET1_R * 0.02, FILLET1_R), (-FILLET1_R * 0.02, -FILLET1_R * 0.02))
            Line((-FILLET1_R * 0.02, -FILLET1_R * 0.02), (FILLET1_R, -FILLET1_R * 0.02))
            Line((FILLET1_R, -FILLET1_R * 0.02), (FILLET1_R, 0))
        make_face()
    fillet1_2_piece_15b = extrude(amount=29.5, mode=Mode.PRIVATE)
    fillet1_2_piece_15b = split(fillet1_2_piece_15b, bisect_by=Plane(origin=(71.868024429, -5, -36.631975571), z_dir=(0, 1, 0)), keep=Keep.TOP, mode=Mode.PRIVATE)
    fillet1_2_piece_15 = fillet1_2_piece_15a & fillet1_2_piece_15b
    add(fillet1_2_piece_15, mode=Mode.SUBTRACT)

    # Fillet2
    fillet2_edges = [part.edges().sort_by_distance(p)[0] for p in [
        (33, 16.5, 20),
        (16.5, 33, 20),
        (0, 16.5, 20),
        (16.5, 0, 20),
    ]]
    fillet(fillet2_edges, radius=FILLET2_R)


solid = part.part
